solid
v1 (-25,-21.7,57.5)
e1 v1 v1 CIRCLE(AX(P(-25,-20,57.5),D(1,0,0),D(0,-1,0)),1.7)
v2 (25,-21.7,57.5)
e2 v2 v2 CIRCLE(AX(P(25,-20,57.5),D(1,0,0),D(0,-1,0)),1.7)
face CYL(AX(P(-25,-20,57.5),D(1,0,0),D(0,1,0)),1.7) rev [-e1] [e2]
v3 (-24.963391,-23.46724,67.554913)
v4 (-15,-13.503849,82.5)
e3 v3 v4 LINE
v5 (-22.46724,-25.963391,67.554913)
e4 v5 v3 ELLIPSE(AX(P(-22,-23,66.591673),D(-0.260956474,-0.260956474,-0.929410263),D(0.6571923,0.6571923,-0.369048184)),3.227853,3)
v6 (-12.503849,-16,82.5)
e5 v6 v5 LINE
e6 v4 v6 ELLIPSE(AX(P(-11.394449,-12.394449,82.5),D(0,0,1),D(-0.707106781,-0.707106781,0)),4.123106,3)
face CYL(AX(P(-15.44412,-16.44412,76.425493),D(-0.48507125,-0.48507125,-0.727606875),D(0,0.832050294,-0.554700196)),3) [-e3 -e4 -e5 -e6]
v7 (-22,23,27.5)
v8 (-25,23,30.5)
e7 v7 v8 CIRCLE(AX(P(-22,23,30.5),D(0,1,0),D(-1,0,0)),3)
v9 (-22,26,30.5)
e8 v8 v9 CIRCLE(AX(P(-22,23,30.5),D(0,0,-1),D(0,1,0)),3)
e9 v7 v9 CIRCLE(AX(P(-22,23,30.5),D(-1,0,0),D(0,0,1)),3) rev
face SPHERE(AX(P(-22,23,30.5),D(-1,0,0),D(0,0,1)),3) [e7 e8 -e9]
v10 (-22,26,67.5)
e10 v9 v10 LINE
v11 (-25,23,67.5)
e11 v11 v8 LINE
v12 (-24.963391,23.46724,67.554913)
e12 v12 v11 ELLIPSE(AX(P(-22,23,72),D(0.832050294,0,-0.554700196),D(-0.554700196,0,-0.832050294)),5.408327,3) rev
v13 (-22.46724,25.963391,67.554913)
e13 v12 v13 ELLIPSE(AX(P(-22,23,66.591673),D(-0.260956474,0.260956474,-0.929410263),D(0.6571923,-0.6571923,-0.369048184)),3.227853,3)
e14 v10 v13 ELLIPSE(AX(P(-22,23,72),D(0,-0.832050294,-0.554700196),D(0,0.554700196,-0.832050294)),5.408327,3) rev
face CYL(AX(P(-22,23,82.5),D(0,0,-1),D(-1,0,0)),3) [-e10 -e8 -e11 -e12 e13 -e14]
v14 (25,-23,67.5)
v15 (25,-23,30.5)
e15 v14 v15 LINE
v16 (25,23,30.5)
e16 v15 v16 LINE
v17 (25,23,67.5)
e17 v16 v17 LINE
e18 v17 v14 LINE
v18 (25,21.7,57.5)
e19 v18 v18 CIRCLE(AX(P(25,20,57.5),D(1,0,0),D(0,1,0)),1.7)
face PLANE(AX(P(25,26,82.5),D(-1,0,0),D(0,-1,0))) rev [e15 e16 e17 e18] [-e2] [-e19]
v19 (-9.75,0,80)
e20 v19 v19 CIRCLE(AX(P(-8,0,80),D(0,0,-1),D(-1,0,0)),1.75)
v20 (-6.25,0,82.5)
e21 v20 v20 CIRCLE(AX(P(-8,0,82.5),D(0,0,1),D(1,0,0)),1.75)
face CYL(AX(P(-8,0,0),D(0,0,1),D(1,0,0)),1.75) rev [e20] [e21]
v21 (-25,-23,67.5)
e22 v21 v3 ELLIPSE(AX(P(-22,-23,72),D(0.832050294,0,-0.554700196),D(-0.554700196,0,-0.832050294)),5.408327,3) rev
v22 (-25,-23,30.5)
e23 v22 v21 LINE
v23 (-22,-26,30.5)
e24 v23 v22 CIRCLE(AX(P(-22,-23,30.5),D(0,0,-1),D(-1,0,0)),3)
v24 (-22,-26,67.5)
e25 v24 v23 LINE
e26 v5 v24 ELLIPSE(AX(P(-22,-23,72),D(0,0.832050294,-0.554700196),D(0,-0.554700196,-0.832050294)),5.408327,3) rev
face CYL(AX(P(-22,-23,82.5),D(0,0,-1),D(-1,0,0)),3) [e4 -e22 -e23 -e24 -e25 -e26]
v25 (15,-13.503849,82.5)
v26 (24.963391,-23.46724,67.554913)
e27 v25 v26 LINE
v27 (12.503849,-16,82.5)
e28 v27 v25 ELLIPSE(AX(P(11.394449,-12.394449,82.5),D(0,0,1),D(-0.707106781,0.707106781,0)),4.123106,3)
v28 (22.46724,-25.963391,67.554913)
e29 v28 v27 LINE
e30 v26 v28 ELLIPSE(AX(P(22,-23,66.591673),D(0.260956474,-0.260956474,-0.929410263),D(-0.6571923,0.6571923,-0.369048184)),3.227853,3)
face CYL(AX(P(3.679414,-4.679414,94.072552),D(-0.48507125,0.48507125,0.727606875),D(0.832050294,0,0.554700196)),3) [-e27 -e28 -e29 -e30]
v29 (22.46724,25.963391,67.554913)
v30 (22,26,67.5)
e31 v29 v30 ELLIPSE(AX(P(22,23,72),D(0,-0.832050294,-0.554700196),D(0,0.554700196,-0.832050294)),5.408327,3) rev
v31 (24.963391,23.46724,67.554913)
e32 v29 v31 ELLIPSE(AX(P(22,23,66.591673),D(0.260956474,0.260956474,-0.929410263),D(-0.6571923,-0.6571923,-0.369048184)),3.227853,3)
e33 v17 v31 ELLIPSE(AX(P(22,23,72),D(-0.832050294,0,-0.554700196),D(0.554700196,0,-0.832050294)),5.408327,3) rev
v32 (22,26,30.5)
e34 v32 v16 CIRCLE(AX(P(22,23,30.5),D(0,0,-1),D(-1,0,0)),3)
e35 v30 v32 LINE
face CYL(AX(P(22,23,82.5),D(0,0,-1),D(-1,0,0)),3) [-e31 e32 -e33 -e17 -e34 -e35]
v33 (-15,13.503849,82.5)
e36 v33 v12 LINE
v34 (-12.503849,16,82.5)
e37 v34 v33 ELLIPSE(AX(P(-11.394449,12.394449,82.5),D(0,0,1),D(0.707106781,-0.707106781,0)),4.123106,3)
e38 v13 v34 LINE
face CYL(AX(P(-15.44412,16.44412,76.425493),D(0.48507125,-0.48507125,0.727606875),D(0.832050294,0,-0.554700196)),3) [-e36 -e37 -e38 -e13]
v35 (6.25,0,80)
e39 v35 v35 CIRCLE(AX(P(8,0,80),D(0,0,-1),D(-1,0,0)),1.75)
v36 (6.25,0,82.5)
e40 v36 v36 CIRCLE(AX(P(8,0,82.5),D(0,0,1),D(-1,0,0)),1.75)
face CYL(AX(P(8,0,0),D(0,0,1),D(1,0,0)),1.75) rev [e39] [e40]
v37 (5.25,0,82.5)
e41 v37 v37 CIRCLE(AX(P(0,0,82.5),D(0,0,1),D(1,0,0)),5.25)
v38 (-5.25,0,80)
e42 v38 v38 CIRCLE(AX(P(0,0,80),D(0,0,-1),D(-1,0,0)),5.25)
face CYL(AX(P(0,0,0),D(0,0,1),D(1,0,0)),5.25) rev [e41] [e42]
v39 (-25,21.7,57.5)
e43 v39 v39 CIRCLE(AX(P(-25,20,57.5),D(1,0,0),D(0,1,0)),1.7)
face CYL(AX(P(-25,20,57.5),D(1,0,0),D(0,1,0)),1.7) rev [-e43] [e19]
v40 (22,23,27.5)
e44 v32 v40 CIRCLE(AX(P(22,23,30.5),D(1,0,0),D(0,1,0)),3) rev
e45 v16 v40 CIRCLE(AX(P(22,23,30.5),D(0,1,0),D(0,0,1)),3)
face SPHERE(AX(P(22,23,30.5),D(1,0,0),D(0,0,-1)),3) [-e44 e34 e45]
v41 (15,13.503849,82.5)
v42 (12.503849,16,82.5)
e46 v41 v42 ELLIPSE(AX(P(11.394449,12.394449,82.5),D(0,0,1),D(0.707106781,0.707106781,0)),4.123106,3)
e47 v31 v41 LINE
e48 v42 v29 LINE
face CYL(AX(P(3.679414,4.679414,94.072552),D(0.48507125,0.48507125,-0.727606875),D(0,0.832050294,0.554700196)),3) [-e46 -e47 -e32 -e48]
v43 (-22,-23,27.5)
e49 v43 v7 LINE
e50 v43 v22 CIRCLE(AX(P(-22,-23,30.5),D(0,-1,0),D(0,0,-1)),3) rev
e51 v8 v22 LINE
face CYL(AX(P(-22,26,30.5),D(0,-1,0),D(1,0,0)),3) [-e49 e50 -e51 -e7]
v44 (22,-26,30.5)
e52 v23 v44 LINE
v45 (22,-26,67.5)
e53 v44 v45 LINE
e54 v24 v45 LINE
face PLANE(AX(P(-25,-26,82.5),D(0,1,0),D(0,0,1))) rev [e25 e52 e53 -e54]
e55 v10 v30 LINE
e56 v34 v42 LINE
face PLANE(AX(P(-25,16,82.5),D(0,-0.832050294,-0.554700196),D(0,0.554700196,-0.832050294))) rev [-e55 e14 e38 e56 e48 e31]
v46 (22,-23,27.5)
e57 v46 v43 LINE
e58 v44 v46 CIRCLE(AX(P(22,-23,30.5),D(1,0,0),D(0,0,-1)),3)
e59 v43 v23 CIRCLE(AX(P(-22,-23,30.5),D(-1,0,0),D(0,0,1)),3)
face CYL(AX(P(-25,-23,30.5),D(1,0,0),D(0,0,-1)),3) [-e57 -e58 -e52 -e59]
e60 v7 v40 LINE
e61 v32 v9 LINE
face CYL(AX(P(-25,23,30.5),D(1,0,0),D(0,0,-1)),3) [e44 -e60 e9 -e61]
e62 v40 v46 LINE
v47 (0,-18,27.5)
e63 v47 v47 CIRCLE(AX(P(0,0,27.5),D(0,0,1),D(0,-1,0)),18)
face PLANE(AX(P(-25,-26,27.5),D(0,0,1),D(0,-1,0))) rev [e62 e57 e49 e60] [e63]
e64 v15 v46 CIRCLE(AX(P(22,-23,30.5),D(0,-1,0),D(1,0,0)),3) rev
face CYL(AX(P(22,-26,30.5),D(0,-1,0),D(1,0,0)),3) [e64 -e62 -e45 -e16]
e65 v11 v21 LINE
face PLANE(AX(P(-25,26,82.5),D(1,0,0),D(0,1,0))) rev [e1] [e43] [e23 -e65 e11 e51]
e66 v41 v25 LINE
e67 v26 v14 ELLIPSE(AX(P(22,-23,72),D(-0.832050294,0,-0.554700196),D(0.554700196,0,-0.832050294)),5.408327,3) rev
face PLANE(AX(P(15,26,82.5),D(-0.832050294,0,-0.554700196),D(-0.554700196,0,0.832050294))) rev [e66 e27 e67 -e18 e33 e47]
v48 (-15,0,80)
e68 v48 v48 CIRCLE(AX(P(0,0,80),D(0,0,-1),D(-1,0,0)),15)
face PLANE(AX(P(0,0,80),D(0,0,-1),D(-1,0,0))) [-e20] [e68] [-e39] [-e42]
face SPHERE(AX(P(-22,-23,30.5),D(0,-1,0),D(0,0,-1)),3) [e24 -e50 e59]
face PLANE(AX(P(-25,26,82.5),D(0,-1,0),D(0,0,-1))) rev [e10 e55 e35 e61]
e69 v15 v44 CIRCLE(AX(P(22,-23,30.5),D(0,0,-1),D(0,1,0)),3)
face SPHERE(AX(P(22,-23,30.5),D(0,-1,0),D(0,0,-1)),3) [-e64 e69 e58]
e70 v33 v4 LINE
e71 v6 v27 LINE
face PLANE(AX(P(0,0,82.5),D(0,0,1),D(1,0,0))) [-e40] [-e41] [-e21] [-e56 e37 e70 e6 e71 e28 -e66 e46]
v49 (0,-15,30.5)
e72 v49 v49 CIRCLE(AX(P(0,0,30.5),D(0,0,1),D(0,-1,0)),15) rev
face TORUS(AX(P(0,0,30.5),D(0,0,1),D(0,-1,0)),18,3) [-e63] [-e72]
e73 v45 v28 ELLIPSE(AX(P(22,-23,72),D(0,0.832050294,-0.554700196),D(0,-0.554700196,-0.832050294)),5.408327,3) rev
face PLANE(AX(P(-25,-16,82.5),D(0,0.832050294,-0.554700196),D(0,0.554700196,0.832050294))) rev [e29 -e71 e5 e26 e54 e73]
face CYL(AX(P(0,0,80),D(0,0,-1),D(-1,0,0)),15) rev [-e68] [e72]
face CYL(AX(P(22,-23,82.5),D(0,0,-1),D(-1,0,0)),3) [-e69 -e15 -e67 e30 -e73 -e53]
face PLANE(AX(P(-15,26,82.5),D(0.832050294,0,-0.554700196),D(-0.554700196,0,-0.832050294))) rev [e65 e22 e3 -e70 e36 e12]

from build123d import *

# Parameters (mm, degrees)
SKETCH1_W           = 50
SKETCH1_H           = 52
BOSS_EXTRUDE1_DEPTH = 82.5
SKETCH2_R           = 15
CUT_EXTRUDE1_DEPTH  = 80
SKETCH3_R           = 5.25
SKETCH3_R_2         = 1.75
CUT_EXTRUDE2_DEPTH  = 91.040268769
SKETCH4_R           = 1.7
CUT_EXTRUDE4_DEPTH  = 100.911210582
SKETCH6_W           = 27.5
SKETCH6_H           = 52
CUT_EXTRUDE5_DEPTH  = 100.911210582
CUT_EXTRUDE6_DEPTH  = 100.911210582
CUT_EXTRUDE7_DEPTH  = 101.673978763
FILLET1_R           = 3


with BuildPart() as part:
    # Sketch1 → Boss-Extrude1 (new body)
    with BuildSketch(Plane.XY):
        Rectangle(SKETCH1_W, SKETCH1_H)
    extrude(amount=BOSS_EXTRUDE1_DEPTH)

    # Sketch2 → Cut-Extrude1 (cut)
    with BuildSketch(Plane(origin=(0, 0, 0), x_dir=(-1, 0, 0), z_dir=(0, 0, -1))):
        Circle(SKETCH2_R)
    extrude(amount=-CUT_EXTRUDE1_DEPTH, mode=Mode.SUBTRACT)

    # Sketch3 → Cut-Extrude2 (cut, through all)
    with BuildSketch(Plane.XY.offset(82.5)):
        Circle(SKETCH3_R)
        with Locations((-8, 0)):
            Circle(SKETCH3_R_2)
        with Locations(Location((8, 0, 0), (0, 0, 180))):
            Circle(SKETCH3_R_2)
    extrude(amount=-CUT_EXTRUDE2_DEPTH, mode=Mode.SUBTRACT)

    # Sketch4 → Cut-Extrude4 (cut, through all)
    with BuildSketch(Plane(origin=(25, 0, 0), x_dir=(0, 0, -1), z_dir=(1, 0, 0))):
        with Locations(Location((-57.5, 20, 0), (0, 0, 90))):
            Circle(SKETCH4_R)
        with Locations(Location((-57.5, -20, 0), (0, 0, 270))):
            Circle(SKETCH4_R)
    extrude(amount=-CUT_EXTRUDE4_DEPTH, mode=Mode.SUBTRACT)

    # Sketch6 → Cut-Extrude5 (cut, through all)
    with BuildSketch(Plane(origin=(25, 0, 0), x_dir=(0, 0, -1), z_dir=(1, 0, 0))):
        with Locations((-13.75, 0)):
            Rectangle(SKETCH6_W, SKETCH6_H)
    extrude(amount=-CUT_EXTRUDE5_DEPTH, mode=Mode.SUBTRACT)

    # Sketch9 → Cut-Extrude6 (cut, through all)
    with BuildSketch(Plane(origin=(25, 0, 0), x_dir=(0, 0, -1), z_dir=(1, 0, 0))):
        Polygon((-82.5, 26), (-82.5, 16), (-67.5, 26), align=None)
        Polygon((-82.5, -16), (-67.5, -26), (-82.5, -26), align=None)
    extrude(amount=-CUT_EXTRUDE6_DEPTH, mode=Mode.SUBTRACT)

    # Sketch10 → Cut-Extrude7 (cut, through all)
    with BuildSketch(Plane.XZ.offset(26)):
        Polygon((15, 82.5), (25, 67.5), (25, 82.5), align=None)
        Polygon((-25, 67.5), (-25, 82.5), (-15, 82.5), align=None)
    extrude(amount=-CUT_EXTRUDE7_DEPTH, mode=Mode.SUBTRACT)

    # Fillet1
    # the kernel refuses this fillet: 3 mm, written as the material it takes off along each edge
    with BuildSketch(Plane(origin=(-22, 23, 30.5), x_dir=(-1, 0, 0), z_dir=(0, 1, 0))) as fillet1_piece_1_section:
        Polygon((0, 0), (FILLET1_R, 0), (FILLET1_R, -FILLET1_R), (0, -FILLET1_R), align=None)
    fillet1_piece_1 = extrude(amount=FILLET1_R, mode=Mode.PRIVATE)
    fillet1_piece_1 = fillet1_piece_1 - Plane(origin=(-22, 23, 30.5), x_dir=(0.7071067811865475, 0, 0.7071067811865475), z_dir=(0, 1, 0)) * Sphere(FILLET1_R, mode=Mode.PRIVATE)
    add(fillet1_piece_1, mode=Mode.SUBTRACT)
    with BuildSketch(Plane(origin=(-22, -23, 30.5), x_dir=(0, 0, -1), z_dir=(-1, 0, 0))) as fillet1_piece_2_section:
        Polygon((0, 0), (FILLET1_R, 0), (FILLET1_R, FILLET1_R), (0, FILLET1_R), align=None)
    fillet1_piece_2 = extrude(amount=FILLET1_R, mode=Mode.PRIVATE)
    fillet1_piece_2 = fillet1_piece_2 - Plane(origin=(-22, -23, 30.5), x_dir=(0, 0.7071067811865475, 0.7071067811865475), z_dir=(-1, 0, 0)) * Sphere(FILLET1_R, mode=Mode.PRIVATE)
    add(fillet1_piece_2, mode=Mode.SUBTRACT)
    with BuildSketch(Plane(origin=(22, -23, 30.5), x_dir=(0, 0, -1), z_dir=(1, 0, 0))) as fillet1_piece_3_section:
        Polygon((0, 0), (FILLET1_R, 0), (FILLET1_R, -FILLET1_R), (0, -FILLET1_R), align=None)
    fillet1_piece_3 = extrude(amount=FILLET1_R, mode=Mode.PRIVATE)
    fillet1_piece_3 = fillet1_piece_3 - Plane(origin=(22, -23, 30.5), x_dir=(0, 0.7071067811865475, 0.7071067811865475), z_dir=(1, 0, 0)) * Sphere(FILLET1_R, mode=Mode.PRIVATE)
    add(fillet1_piece_3, mode=Mode.SUBTRACT)
    with BuildSketch(Plane(origin=(22, 23, 30.5), x_dir=(1, 0, 0), z_dir=(0, 1, 0))) as fillet1_piece_4_section:
        Polygon((0, 0), (FILLET1_R, 0), (FILLET1_R, FILLET1_R), (0, FILLET1_R), align=None)
    fillet1_piece_4 = extrude(amount=FILLET1_R, mode=Mode.PRIVATE)
    fillet1_piece_4 = fillet1_piece_4 - Plane(origin=(22, 23, 30.5), x_dir=(-0.7071067811865475, 0, 0.7071067811865475), z_dir=(0, 1, 0)) * Sphere(FILLET1_R, mode=Mode.PRIVATE)
    add(fillet1_piece_4, mode=Mode.SUBTRACT)
    with BuildSketch(Plane(origin=(12.352941176, -13.352941176, 86.470588235), x_dir=(0.26906911759852636, 0.8744746321952062, -0.40360367639778677), z_dir=(0.4850712500726659, -0.4850712500726661, -0.7276068751089989)), Plane(origin=(12.352941176, 13.352941176, 86.470588235), x_dir=(-0.8744746321952062, 0.26906911759852264, -0.4036036763977888), z_dir=(0.4850712500726658, 0.48507125007266627, -0.7276068751089988))) as fillet1_piece_5:
        with BuildLine():
            CenterArc((FILLET1_R * 0.727606875109, -FILLET1_R), FILLET1_R, 90, 72.079786861)
            Line((-FILLET1_R * 0.223879038495, -FILLET1_R * 0.692307692308), (0, 0))
            Line((0, 0), (FILLET1_R * 0.727606875109, 0))
        make_face()
    extrude(amount=31.529631255, mode=Mode.SUBTRACT)
    with BuildSketch(Plane(origin=(-12.352941176, -13.352941176, 86.470588235), x_dir=(-0.26906911759852215, 0.8744746321952062, -0.4036036763977897), z_dir=(-0.485071250072666, -0.48507125007266627, -0.7276068751089988)), Plane(origin=(-12.352941176, 13.352941176, 86.470588235), x_dir=(0.8744746321952063, 0.2690691175985245, -0.40360367639778794), z_dir=(-0.485071250072666, 0.48507125007266605, -0.7276068751089988))) as fillet1_piece_6:
        with BuildLine():
            CenterArc((FILLET1_R * 0.727606875109, FILLET1_R), FILLET1_R, 197.920213139, 72.079786861)
            Line((-FILLET1_R * 0.223879038495, FILLET1_R * 0.692307692308), (0, 0))
            Line((0, 0), (FILLET1_R * 0.727606875109, 0))
        make_face()
    extrude(amount=31.529631255, mode=Mode.SUBTRACT)
    with BuildSketch(Plane(origin=(-25, 23, 27.5), x_dir=(0, 0, 1), z_dir=(0, -1, 0)), Plane(origin=(25, -23, 27.5), x_dir=(0, 0, 1), z_dir=(0, 1, 0))) as fillet1_piece_7:
        with BuildLine():
            CenterArc((FILLET1_R, -FILLET1_R), FILLET1_R, 90, 90)
            Line((0, -FILLET1_R), (0, 0))
            Line((0, 0), (FILLET1_R, 0))
        make_face()
    extrude(amount=46, mode=Mode.SUBTRACT)
    with BuildSketch(Plane(origin=(22, -26, 27.5), x_dir=(0, 1, 0), z_dir=(-1, 0, 0)), Plane(origin=(22, 26, 27.5), x_dir=(0, 0, 1), z_dir=(-1, 0, 0))) as fillet1_piece_8:
        with BuildLine():
            CenterArc((FILLET1_R, -FILLET1_R), FILLET1_R, 90, 90)
            Line((0, -FILLET1_R), (0, 0))
            Line((0, 0), (FILLET1_R, 0))
        make_face()
    extrude(amount=44, mode=Mode.SUBTRACT)
    with BuildSketch(Plane(origin=(0, 0, 27.5), x_dir=(-1, 0, 0), z_dir=(0, -1, 0))) as fillet1_piece_9:
        with BuildLine():
            CenterArc((15 + FILLET1_R, -FILLET1_R), FILLET1_R, 90, 90)
            Line((15, -FILLET1_R), (15, 0))
            Line((15, 0), (15 + FILLET1_R, 0))
        make_face()
    revolve(axis=Axis((0, 0, 27.5), (0, 0, -1)), mode=Mode.SUBTRACT)
    with BuildSketch(Plane(origin=(-25, -26, 30.5), x_dir=(0, 1, 0), z_dir=(0, 0, 1)), Plane(origin=(-25, 26, 30.5), x_dir=(1, 0, 0), z_dir=(0, 0, 1))) as fillet1_piece_10:
        with BuildLine():
            CenterArc((FILLET1_R, -FILLET1_R), FILLET1_R, 90, 90)
            Line((0, -FILLET1_R), (0, 0))
            Line((0, 0), (FILLET1_R, 0))
        make_face()
    extrude(amount=44.5, mode=Mode.SUBTRACT)
    with BuildSketch(Plane(origin=(25, -26, 30.5), x_dir=(0, 1, 0), z_dir=(0, 0, 1)), Plane(origin=(25, 26, 30.5), x_dir=(-1, 0, 0), z_dir=(0, 0, 1))) as fillet1_piece_11:
        with BuildLine():
            CenterArc((FILLET1_R, FILLET1_R), FILLET1_R, 180, 90)
            Line((0, FILLET1_R), (0, 0))
            Line((0, 0), (FILLET1_R, 0))
        make_face()
    extrude(amount=44.5, mode=Mode.SUBTRACT)


solid = part.part
